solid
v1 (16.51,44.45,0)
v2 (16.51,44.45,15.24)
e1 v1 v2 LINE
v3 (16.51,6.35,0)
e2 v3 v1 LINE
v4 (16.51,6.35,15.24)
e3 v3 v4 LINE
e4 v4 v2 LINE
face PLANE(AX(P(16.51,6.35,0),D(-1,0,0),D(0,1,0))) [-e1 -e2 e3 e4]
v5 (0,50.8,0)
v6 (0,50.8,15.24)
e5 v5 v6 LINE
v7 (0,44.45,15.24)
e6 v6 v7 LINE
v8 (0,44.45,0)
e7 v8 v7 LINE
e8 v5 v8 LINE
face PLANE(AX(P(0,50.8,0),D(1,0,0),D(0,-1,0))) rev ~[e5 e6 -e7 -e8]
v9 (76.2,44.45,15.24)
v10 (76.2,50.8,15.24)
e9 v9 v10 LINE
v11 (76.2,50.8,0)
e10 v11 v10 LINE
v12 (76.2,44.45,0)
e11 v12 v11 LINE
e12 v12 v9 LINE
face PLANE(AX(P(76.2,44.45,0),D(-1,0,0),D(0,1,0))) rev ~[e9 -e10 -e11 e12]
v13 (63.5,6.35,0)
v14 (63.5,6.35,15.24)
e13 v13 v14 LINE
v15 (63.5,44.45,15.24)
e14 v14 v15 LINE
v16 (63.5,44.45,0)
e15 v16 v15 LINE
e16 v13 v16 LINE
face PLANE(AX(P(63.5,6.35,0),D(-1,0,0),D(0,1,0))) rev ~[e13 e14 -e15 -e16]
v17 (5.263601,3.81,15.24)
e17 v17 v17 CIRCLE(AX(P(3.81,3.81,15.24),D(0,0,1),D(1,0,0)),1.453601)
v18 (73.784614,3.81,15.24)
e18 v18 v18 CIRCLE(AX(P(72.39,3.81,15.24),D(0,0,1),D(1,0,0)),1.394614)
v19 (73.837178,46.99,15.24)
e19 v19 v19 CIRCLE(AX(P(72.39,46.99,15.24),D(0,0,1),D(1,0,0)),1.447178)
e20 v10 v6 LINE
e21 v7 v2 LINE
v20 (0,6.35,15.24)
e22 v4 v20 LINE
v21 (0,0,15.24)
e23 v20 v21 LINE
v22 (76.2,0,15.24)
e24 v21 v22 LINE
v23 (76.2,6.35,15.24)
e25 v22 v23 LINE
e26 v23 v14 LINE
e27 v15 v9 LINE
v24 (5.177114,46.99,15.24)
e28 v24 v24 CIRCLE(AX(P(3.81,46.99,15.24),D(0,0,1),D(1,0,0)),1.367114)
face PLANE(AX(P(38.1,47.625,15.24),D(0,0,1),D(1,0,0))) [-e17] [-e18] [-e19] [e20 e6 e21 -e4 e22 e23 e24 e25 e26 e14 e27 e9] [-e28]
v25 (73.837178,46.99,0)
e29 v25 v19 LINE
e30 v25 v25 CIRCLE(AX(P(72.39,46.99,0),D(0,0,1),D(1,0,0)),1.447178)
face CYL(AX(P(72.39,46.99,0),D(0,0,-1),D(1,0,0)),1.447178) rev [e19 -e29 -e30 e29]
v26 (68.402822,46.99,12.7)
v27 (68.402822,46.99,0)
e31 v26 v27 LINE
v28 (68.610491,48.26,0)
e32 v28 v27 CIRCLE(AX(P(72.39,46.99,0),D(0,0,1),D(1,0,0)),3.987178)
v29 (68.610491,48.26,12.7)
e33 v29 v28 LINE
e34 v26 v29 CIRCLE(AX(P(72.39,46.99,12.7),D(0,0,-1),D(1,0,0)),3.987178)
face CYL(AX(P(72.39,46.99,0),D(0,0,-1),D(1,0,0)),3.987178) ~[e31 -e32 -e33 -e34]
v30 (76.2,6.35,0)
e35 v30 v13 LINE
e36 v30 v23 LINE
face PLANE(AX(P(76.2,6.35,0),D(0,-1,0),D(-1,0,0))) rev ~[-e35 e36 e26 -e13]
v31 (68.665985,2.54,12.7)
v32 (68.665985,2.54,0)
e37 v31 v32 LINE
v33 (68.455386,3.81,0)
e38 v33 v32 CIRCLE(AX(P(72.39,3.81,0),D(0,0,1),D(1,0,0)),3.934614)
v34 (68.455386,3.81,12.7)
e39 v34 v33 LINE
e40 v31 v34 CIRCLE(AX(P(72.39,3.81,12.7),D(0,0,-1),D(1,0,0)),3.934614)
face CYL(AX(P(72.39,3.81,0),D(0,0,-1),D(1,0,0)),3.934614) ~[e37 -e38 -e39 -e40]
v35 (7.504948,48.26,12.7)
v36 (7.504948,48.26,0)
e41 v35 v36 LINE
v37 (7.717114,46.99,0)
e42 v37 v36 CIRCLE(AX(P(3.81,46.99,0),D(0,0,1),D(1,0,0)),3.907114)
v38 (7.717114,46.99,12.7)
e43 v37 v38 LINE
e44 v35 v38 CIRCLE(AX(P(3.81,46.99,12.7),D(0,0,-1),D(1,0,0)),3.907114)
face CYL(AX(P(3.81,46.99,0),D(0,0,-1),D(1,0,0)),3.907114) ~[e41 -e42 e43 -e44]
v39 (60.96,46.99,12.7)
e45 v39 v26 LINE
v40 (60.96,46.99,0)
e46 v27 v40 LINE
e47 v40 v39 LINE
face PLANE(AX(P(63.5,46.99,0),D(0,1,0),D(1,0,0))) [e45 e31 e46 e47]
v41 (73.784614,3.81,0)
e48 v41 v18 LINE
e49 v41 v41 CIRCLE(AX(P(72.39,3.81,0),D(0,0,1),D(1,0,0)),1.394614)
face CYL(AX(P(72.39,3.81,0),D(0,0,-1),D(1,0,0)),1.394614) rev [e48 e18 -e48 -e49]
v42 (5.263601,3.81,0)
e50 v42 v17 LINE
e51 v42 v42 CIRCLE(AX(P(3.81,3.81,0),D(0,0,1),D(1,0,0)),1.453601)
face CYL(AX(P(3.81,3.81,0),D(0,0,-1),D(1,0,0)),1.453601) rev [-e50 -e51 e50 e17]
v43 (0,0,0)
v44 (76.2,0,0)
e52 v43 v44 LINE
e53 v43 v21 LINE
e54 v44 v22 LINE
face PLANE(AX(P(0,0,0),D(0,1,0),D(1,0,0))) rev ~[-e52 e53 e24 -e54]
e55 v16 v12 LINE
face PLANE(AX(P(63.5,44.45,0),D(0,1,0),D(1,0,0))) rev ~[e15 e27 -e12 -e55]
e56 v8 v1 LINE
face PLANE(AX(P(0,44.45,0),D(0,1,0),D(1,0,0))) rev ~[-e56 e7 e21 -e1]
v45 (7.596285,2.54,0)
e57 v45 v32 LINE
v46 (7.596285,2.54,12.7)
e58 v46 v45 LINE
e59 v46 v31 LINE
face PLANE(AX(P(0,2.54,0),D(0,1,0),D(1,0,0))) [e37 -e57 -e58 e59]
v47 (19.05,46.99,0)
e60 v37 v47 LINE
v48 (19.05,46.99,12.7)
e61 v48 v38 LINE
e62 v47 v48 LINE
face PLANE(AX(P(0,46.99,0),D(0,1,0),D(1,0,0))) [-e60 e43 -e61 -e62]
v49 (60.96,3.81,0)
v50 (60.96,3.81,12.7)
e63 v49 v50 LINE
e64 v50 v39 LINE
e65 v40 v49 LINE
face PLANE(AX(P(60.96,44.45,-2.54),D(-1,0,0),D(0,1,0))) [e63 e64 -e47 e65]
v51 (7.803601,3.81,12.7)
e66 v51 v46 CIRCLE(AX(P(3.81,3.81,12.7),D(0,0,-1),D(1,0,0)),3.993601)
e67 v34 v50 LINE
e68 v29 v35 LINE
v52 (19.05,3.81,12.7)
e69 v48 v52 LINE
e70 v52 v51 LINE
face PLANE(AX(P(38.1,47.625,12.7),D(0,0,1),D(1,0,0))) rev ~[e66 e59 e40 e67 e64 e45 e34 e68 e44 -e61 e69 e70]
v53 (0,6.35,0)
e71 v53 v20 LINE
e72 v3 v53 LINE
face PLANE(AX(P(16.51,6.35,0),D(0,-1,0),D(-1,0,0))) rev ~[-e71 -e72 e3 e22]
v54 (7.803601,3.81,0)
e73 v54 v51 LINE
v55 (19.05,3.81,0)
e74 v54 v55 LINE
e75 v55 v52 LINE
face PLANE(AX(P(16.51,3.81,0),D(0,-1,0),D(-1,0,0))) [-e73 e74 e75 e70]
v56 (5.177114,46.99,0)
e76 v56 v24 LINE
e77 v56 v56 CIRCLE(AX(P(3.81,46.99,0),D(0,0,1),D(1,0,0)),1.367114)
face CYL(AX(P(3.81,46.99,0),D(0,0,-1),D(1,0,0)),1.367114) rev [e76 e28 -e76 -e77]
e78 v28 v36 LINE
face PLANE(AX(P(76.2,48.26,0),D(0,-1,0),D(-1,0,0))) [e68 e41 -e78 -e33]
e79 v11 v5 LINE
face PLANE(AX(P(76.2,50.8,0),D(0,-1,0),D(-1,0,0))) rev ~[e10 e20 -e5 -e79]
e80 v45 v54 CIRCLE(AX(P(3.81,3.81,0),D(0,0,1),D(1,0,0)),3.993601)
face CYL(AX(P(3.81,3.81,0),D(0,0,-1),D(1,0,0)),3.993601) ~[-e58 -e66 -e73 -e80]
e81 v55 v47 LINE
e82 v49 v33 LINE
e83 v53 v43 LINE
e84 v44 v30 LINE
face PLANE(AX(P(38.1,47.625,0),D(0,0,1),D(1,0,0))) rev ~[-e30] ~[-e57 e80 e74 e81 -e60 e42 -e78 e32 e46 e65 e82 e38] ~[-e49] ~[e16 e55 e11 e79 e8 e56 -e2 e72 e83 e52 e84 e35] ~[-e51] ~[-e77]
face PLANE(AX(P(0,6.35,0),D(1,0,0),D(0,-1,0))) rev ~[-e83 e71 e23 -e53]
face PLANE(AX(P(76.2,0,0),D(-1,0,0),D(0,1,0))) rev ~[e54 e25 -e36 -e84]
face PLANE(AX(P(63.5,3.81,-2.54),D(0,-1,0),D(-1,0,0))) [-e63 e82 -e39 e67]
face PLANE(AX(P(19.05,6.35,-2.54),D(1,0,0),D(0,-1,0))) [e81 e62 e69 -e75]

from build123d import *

# Parameters (mm, degrees)
F0_R        = 1.3671138527
F0_R_2      = 1.4471777078
F0_W        = 46.99
F0_H        = 38.1
F0_R_3      = 1.4536013708
F0_R_4      = 1.3946138209
F1_DEPTH    = 15.24
F2_T        = 2.54
F2_T3_DEPTH = 20.32


# Not quite as in the source:
# - a shell that OpenCascade refuses in one call is made with other operations: the cavity is built on its own and cut out


with BuildPart() as f1:
    # F0 (on Top) → F1 (new body)
    with BuildSketch(Plane.XY):
        Polygon((0, 46.99), (0, 44.45), (16.51, 44.45), (63.5, 44.45), (76.2, 44.45), (76.2, 46.99), (76.2, 50.8), (72.39, 50.8), (3.81, 50.8), (0, 50.8), align=None)
        with Locations((3.81, 46.99)):
            Circle(F0_R, mode=Mode.SUBTRACT)
        with Locations((72.39, 46.99)):
            Circle(F0_R_2, mode=Mode.SUBTRACT)
        with Locations((40.005, 25.4)):
            Rectangle(F0_W, F0_H)
        Polygon((0, 3.175), (0, 0), (3.81, 0), (72.39, 0), (76.2, 0), (76.2, 3.81), (76.2, 6.35), (63.5, 6.35), (16.51, 6.35), (0, 6.35), (0, 3.81), align=None)
        with Locations((3.81, 3.81)):
            Circle(F0_R_3, mode=Mode.SUBTRACT)
        with Locations((72.39, 3.81)):
            Circle(F0_R_4, mode=Mode.SUBTRACT)
    extrude(amount=F1_DEPTH)

    # F2: shell of thickness 2.54, made by hand


with BuildPart() as f2_core1:
    # F2_t2: copy of F1
    add(f1.part)

    # the walls: a layer under each face that stays
    f2_faces = [f2_core1.faces().sort_by_distance(p)[0] for p in [
        (8.255, 44.45, 7.62),
        (16.51, 25.4, 7.62),
        (8.255, 6.35, 7.62),
        (0, 3.175, 7.62),
        (38.1, 0, 7.62),
        (76.2, 3.175, 7.62),
        (69.85, 6.35, 7.62),
        (63.5, 25.4, 7.62),
        (69.85, 44.45, 7.62),
        (76.2, 47.625, 7.62),
        (38.1, 50.8, 7.62),
        (0, 47.625, 7.62),
        (2.4428861473, 46.99, 7.62),
        (70.9428222922, 46.99, 7.62),
        (70.9953861791, 3.81, 7.62),
        (2.3563986292, 3.81, 7.62),
        (38.1, 25.4, 15.24),
    ]]
    thicken(f2_faces, amount=-F2_T, mode=Mode.SUBTRACT)

    # F2_s4 → F2_t3 (cut)
    with BuildSketch(Plane.XY.offset(-2.54)):
        Polygon((16.4846, 44.4246), (16.51, 46.99), (19.05, 46.99), (19.05, 44.45), align=None)
        Polygon((16.4846, 6.3754), (19.05, 6.35), (19.05, 3.81), (16.51, 3.81), align=None)
        Polygon((63.5254, 6.3754), (63.5, 3.81), (60.96, 3.81), (60.96, 6.35), align=None)
        Polygon((63.5254, 44.4246), (60.96, 44.45), (60.96, 46.99), (63.5, 46.99), align=None)
    extrude(amount=F2_T3_DEPTH, mode=Mode.SUBTRACT)


with BuildPart() as f1_1:
    add(f1.part)

    # what is left inside the walls is the cavity
    f2_cavity = [f2_core1.part.solids().sort_by_distance(p)[0] for p in [
        (38.085466, 17.78, 0.0254),
    ]]
    add(f2_cavity, mode=Mode.SUBTRACT)


solid = f1_1.part
